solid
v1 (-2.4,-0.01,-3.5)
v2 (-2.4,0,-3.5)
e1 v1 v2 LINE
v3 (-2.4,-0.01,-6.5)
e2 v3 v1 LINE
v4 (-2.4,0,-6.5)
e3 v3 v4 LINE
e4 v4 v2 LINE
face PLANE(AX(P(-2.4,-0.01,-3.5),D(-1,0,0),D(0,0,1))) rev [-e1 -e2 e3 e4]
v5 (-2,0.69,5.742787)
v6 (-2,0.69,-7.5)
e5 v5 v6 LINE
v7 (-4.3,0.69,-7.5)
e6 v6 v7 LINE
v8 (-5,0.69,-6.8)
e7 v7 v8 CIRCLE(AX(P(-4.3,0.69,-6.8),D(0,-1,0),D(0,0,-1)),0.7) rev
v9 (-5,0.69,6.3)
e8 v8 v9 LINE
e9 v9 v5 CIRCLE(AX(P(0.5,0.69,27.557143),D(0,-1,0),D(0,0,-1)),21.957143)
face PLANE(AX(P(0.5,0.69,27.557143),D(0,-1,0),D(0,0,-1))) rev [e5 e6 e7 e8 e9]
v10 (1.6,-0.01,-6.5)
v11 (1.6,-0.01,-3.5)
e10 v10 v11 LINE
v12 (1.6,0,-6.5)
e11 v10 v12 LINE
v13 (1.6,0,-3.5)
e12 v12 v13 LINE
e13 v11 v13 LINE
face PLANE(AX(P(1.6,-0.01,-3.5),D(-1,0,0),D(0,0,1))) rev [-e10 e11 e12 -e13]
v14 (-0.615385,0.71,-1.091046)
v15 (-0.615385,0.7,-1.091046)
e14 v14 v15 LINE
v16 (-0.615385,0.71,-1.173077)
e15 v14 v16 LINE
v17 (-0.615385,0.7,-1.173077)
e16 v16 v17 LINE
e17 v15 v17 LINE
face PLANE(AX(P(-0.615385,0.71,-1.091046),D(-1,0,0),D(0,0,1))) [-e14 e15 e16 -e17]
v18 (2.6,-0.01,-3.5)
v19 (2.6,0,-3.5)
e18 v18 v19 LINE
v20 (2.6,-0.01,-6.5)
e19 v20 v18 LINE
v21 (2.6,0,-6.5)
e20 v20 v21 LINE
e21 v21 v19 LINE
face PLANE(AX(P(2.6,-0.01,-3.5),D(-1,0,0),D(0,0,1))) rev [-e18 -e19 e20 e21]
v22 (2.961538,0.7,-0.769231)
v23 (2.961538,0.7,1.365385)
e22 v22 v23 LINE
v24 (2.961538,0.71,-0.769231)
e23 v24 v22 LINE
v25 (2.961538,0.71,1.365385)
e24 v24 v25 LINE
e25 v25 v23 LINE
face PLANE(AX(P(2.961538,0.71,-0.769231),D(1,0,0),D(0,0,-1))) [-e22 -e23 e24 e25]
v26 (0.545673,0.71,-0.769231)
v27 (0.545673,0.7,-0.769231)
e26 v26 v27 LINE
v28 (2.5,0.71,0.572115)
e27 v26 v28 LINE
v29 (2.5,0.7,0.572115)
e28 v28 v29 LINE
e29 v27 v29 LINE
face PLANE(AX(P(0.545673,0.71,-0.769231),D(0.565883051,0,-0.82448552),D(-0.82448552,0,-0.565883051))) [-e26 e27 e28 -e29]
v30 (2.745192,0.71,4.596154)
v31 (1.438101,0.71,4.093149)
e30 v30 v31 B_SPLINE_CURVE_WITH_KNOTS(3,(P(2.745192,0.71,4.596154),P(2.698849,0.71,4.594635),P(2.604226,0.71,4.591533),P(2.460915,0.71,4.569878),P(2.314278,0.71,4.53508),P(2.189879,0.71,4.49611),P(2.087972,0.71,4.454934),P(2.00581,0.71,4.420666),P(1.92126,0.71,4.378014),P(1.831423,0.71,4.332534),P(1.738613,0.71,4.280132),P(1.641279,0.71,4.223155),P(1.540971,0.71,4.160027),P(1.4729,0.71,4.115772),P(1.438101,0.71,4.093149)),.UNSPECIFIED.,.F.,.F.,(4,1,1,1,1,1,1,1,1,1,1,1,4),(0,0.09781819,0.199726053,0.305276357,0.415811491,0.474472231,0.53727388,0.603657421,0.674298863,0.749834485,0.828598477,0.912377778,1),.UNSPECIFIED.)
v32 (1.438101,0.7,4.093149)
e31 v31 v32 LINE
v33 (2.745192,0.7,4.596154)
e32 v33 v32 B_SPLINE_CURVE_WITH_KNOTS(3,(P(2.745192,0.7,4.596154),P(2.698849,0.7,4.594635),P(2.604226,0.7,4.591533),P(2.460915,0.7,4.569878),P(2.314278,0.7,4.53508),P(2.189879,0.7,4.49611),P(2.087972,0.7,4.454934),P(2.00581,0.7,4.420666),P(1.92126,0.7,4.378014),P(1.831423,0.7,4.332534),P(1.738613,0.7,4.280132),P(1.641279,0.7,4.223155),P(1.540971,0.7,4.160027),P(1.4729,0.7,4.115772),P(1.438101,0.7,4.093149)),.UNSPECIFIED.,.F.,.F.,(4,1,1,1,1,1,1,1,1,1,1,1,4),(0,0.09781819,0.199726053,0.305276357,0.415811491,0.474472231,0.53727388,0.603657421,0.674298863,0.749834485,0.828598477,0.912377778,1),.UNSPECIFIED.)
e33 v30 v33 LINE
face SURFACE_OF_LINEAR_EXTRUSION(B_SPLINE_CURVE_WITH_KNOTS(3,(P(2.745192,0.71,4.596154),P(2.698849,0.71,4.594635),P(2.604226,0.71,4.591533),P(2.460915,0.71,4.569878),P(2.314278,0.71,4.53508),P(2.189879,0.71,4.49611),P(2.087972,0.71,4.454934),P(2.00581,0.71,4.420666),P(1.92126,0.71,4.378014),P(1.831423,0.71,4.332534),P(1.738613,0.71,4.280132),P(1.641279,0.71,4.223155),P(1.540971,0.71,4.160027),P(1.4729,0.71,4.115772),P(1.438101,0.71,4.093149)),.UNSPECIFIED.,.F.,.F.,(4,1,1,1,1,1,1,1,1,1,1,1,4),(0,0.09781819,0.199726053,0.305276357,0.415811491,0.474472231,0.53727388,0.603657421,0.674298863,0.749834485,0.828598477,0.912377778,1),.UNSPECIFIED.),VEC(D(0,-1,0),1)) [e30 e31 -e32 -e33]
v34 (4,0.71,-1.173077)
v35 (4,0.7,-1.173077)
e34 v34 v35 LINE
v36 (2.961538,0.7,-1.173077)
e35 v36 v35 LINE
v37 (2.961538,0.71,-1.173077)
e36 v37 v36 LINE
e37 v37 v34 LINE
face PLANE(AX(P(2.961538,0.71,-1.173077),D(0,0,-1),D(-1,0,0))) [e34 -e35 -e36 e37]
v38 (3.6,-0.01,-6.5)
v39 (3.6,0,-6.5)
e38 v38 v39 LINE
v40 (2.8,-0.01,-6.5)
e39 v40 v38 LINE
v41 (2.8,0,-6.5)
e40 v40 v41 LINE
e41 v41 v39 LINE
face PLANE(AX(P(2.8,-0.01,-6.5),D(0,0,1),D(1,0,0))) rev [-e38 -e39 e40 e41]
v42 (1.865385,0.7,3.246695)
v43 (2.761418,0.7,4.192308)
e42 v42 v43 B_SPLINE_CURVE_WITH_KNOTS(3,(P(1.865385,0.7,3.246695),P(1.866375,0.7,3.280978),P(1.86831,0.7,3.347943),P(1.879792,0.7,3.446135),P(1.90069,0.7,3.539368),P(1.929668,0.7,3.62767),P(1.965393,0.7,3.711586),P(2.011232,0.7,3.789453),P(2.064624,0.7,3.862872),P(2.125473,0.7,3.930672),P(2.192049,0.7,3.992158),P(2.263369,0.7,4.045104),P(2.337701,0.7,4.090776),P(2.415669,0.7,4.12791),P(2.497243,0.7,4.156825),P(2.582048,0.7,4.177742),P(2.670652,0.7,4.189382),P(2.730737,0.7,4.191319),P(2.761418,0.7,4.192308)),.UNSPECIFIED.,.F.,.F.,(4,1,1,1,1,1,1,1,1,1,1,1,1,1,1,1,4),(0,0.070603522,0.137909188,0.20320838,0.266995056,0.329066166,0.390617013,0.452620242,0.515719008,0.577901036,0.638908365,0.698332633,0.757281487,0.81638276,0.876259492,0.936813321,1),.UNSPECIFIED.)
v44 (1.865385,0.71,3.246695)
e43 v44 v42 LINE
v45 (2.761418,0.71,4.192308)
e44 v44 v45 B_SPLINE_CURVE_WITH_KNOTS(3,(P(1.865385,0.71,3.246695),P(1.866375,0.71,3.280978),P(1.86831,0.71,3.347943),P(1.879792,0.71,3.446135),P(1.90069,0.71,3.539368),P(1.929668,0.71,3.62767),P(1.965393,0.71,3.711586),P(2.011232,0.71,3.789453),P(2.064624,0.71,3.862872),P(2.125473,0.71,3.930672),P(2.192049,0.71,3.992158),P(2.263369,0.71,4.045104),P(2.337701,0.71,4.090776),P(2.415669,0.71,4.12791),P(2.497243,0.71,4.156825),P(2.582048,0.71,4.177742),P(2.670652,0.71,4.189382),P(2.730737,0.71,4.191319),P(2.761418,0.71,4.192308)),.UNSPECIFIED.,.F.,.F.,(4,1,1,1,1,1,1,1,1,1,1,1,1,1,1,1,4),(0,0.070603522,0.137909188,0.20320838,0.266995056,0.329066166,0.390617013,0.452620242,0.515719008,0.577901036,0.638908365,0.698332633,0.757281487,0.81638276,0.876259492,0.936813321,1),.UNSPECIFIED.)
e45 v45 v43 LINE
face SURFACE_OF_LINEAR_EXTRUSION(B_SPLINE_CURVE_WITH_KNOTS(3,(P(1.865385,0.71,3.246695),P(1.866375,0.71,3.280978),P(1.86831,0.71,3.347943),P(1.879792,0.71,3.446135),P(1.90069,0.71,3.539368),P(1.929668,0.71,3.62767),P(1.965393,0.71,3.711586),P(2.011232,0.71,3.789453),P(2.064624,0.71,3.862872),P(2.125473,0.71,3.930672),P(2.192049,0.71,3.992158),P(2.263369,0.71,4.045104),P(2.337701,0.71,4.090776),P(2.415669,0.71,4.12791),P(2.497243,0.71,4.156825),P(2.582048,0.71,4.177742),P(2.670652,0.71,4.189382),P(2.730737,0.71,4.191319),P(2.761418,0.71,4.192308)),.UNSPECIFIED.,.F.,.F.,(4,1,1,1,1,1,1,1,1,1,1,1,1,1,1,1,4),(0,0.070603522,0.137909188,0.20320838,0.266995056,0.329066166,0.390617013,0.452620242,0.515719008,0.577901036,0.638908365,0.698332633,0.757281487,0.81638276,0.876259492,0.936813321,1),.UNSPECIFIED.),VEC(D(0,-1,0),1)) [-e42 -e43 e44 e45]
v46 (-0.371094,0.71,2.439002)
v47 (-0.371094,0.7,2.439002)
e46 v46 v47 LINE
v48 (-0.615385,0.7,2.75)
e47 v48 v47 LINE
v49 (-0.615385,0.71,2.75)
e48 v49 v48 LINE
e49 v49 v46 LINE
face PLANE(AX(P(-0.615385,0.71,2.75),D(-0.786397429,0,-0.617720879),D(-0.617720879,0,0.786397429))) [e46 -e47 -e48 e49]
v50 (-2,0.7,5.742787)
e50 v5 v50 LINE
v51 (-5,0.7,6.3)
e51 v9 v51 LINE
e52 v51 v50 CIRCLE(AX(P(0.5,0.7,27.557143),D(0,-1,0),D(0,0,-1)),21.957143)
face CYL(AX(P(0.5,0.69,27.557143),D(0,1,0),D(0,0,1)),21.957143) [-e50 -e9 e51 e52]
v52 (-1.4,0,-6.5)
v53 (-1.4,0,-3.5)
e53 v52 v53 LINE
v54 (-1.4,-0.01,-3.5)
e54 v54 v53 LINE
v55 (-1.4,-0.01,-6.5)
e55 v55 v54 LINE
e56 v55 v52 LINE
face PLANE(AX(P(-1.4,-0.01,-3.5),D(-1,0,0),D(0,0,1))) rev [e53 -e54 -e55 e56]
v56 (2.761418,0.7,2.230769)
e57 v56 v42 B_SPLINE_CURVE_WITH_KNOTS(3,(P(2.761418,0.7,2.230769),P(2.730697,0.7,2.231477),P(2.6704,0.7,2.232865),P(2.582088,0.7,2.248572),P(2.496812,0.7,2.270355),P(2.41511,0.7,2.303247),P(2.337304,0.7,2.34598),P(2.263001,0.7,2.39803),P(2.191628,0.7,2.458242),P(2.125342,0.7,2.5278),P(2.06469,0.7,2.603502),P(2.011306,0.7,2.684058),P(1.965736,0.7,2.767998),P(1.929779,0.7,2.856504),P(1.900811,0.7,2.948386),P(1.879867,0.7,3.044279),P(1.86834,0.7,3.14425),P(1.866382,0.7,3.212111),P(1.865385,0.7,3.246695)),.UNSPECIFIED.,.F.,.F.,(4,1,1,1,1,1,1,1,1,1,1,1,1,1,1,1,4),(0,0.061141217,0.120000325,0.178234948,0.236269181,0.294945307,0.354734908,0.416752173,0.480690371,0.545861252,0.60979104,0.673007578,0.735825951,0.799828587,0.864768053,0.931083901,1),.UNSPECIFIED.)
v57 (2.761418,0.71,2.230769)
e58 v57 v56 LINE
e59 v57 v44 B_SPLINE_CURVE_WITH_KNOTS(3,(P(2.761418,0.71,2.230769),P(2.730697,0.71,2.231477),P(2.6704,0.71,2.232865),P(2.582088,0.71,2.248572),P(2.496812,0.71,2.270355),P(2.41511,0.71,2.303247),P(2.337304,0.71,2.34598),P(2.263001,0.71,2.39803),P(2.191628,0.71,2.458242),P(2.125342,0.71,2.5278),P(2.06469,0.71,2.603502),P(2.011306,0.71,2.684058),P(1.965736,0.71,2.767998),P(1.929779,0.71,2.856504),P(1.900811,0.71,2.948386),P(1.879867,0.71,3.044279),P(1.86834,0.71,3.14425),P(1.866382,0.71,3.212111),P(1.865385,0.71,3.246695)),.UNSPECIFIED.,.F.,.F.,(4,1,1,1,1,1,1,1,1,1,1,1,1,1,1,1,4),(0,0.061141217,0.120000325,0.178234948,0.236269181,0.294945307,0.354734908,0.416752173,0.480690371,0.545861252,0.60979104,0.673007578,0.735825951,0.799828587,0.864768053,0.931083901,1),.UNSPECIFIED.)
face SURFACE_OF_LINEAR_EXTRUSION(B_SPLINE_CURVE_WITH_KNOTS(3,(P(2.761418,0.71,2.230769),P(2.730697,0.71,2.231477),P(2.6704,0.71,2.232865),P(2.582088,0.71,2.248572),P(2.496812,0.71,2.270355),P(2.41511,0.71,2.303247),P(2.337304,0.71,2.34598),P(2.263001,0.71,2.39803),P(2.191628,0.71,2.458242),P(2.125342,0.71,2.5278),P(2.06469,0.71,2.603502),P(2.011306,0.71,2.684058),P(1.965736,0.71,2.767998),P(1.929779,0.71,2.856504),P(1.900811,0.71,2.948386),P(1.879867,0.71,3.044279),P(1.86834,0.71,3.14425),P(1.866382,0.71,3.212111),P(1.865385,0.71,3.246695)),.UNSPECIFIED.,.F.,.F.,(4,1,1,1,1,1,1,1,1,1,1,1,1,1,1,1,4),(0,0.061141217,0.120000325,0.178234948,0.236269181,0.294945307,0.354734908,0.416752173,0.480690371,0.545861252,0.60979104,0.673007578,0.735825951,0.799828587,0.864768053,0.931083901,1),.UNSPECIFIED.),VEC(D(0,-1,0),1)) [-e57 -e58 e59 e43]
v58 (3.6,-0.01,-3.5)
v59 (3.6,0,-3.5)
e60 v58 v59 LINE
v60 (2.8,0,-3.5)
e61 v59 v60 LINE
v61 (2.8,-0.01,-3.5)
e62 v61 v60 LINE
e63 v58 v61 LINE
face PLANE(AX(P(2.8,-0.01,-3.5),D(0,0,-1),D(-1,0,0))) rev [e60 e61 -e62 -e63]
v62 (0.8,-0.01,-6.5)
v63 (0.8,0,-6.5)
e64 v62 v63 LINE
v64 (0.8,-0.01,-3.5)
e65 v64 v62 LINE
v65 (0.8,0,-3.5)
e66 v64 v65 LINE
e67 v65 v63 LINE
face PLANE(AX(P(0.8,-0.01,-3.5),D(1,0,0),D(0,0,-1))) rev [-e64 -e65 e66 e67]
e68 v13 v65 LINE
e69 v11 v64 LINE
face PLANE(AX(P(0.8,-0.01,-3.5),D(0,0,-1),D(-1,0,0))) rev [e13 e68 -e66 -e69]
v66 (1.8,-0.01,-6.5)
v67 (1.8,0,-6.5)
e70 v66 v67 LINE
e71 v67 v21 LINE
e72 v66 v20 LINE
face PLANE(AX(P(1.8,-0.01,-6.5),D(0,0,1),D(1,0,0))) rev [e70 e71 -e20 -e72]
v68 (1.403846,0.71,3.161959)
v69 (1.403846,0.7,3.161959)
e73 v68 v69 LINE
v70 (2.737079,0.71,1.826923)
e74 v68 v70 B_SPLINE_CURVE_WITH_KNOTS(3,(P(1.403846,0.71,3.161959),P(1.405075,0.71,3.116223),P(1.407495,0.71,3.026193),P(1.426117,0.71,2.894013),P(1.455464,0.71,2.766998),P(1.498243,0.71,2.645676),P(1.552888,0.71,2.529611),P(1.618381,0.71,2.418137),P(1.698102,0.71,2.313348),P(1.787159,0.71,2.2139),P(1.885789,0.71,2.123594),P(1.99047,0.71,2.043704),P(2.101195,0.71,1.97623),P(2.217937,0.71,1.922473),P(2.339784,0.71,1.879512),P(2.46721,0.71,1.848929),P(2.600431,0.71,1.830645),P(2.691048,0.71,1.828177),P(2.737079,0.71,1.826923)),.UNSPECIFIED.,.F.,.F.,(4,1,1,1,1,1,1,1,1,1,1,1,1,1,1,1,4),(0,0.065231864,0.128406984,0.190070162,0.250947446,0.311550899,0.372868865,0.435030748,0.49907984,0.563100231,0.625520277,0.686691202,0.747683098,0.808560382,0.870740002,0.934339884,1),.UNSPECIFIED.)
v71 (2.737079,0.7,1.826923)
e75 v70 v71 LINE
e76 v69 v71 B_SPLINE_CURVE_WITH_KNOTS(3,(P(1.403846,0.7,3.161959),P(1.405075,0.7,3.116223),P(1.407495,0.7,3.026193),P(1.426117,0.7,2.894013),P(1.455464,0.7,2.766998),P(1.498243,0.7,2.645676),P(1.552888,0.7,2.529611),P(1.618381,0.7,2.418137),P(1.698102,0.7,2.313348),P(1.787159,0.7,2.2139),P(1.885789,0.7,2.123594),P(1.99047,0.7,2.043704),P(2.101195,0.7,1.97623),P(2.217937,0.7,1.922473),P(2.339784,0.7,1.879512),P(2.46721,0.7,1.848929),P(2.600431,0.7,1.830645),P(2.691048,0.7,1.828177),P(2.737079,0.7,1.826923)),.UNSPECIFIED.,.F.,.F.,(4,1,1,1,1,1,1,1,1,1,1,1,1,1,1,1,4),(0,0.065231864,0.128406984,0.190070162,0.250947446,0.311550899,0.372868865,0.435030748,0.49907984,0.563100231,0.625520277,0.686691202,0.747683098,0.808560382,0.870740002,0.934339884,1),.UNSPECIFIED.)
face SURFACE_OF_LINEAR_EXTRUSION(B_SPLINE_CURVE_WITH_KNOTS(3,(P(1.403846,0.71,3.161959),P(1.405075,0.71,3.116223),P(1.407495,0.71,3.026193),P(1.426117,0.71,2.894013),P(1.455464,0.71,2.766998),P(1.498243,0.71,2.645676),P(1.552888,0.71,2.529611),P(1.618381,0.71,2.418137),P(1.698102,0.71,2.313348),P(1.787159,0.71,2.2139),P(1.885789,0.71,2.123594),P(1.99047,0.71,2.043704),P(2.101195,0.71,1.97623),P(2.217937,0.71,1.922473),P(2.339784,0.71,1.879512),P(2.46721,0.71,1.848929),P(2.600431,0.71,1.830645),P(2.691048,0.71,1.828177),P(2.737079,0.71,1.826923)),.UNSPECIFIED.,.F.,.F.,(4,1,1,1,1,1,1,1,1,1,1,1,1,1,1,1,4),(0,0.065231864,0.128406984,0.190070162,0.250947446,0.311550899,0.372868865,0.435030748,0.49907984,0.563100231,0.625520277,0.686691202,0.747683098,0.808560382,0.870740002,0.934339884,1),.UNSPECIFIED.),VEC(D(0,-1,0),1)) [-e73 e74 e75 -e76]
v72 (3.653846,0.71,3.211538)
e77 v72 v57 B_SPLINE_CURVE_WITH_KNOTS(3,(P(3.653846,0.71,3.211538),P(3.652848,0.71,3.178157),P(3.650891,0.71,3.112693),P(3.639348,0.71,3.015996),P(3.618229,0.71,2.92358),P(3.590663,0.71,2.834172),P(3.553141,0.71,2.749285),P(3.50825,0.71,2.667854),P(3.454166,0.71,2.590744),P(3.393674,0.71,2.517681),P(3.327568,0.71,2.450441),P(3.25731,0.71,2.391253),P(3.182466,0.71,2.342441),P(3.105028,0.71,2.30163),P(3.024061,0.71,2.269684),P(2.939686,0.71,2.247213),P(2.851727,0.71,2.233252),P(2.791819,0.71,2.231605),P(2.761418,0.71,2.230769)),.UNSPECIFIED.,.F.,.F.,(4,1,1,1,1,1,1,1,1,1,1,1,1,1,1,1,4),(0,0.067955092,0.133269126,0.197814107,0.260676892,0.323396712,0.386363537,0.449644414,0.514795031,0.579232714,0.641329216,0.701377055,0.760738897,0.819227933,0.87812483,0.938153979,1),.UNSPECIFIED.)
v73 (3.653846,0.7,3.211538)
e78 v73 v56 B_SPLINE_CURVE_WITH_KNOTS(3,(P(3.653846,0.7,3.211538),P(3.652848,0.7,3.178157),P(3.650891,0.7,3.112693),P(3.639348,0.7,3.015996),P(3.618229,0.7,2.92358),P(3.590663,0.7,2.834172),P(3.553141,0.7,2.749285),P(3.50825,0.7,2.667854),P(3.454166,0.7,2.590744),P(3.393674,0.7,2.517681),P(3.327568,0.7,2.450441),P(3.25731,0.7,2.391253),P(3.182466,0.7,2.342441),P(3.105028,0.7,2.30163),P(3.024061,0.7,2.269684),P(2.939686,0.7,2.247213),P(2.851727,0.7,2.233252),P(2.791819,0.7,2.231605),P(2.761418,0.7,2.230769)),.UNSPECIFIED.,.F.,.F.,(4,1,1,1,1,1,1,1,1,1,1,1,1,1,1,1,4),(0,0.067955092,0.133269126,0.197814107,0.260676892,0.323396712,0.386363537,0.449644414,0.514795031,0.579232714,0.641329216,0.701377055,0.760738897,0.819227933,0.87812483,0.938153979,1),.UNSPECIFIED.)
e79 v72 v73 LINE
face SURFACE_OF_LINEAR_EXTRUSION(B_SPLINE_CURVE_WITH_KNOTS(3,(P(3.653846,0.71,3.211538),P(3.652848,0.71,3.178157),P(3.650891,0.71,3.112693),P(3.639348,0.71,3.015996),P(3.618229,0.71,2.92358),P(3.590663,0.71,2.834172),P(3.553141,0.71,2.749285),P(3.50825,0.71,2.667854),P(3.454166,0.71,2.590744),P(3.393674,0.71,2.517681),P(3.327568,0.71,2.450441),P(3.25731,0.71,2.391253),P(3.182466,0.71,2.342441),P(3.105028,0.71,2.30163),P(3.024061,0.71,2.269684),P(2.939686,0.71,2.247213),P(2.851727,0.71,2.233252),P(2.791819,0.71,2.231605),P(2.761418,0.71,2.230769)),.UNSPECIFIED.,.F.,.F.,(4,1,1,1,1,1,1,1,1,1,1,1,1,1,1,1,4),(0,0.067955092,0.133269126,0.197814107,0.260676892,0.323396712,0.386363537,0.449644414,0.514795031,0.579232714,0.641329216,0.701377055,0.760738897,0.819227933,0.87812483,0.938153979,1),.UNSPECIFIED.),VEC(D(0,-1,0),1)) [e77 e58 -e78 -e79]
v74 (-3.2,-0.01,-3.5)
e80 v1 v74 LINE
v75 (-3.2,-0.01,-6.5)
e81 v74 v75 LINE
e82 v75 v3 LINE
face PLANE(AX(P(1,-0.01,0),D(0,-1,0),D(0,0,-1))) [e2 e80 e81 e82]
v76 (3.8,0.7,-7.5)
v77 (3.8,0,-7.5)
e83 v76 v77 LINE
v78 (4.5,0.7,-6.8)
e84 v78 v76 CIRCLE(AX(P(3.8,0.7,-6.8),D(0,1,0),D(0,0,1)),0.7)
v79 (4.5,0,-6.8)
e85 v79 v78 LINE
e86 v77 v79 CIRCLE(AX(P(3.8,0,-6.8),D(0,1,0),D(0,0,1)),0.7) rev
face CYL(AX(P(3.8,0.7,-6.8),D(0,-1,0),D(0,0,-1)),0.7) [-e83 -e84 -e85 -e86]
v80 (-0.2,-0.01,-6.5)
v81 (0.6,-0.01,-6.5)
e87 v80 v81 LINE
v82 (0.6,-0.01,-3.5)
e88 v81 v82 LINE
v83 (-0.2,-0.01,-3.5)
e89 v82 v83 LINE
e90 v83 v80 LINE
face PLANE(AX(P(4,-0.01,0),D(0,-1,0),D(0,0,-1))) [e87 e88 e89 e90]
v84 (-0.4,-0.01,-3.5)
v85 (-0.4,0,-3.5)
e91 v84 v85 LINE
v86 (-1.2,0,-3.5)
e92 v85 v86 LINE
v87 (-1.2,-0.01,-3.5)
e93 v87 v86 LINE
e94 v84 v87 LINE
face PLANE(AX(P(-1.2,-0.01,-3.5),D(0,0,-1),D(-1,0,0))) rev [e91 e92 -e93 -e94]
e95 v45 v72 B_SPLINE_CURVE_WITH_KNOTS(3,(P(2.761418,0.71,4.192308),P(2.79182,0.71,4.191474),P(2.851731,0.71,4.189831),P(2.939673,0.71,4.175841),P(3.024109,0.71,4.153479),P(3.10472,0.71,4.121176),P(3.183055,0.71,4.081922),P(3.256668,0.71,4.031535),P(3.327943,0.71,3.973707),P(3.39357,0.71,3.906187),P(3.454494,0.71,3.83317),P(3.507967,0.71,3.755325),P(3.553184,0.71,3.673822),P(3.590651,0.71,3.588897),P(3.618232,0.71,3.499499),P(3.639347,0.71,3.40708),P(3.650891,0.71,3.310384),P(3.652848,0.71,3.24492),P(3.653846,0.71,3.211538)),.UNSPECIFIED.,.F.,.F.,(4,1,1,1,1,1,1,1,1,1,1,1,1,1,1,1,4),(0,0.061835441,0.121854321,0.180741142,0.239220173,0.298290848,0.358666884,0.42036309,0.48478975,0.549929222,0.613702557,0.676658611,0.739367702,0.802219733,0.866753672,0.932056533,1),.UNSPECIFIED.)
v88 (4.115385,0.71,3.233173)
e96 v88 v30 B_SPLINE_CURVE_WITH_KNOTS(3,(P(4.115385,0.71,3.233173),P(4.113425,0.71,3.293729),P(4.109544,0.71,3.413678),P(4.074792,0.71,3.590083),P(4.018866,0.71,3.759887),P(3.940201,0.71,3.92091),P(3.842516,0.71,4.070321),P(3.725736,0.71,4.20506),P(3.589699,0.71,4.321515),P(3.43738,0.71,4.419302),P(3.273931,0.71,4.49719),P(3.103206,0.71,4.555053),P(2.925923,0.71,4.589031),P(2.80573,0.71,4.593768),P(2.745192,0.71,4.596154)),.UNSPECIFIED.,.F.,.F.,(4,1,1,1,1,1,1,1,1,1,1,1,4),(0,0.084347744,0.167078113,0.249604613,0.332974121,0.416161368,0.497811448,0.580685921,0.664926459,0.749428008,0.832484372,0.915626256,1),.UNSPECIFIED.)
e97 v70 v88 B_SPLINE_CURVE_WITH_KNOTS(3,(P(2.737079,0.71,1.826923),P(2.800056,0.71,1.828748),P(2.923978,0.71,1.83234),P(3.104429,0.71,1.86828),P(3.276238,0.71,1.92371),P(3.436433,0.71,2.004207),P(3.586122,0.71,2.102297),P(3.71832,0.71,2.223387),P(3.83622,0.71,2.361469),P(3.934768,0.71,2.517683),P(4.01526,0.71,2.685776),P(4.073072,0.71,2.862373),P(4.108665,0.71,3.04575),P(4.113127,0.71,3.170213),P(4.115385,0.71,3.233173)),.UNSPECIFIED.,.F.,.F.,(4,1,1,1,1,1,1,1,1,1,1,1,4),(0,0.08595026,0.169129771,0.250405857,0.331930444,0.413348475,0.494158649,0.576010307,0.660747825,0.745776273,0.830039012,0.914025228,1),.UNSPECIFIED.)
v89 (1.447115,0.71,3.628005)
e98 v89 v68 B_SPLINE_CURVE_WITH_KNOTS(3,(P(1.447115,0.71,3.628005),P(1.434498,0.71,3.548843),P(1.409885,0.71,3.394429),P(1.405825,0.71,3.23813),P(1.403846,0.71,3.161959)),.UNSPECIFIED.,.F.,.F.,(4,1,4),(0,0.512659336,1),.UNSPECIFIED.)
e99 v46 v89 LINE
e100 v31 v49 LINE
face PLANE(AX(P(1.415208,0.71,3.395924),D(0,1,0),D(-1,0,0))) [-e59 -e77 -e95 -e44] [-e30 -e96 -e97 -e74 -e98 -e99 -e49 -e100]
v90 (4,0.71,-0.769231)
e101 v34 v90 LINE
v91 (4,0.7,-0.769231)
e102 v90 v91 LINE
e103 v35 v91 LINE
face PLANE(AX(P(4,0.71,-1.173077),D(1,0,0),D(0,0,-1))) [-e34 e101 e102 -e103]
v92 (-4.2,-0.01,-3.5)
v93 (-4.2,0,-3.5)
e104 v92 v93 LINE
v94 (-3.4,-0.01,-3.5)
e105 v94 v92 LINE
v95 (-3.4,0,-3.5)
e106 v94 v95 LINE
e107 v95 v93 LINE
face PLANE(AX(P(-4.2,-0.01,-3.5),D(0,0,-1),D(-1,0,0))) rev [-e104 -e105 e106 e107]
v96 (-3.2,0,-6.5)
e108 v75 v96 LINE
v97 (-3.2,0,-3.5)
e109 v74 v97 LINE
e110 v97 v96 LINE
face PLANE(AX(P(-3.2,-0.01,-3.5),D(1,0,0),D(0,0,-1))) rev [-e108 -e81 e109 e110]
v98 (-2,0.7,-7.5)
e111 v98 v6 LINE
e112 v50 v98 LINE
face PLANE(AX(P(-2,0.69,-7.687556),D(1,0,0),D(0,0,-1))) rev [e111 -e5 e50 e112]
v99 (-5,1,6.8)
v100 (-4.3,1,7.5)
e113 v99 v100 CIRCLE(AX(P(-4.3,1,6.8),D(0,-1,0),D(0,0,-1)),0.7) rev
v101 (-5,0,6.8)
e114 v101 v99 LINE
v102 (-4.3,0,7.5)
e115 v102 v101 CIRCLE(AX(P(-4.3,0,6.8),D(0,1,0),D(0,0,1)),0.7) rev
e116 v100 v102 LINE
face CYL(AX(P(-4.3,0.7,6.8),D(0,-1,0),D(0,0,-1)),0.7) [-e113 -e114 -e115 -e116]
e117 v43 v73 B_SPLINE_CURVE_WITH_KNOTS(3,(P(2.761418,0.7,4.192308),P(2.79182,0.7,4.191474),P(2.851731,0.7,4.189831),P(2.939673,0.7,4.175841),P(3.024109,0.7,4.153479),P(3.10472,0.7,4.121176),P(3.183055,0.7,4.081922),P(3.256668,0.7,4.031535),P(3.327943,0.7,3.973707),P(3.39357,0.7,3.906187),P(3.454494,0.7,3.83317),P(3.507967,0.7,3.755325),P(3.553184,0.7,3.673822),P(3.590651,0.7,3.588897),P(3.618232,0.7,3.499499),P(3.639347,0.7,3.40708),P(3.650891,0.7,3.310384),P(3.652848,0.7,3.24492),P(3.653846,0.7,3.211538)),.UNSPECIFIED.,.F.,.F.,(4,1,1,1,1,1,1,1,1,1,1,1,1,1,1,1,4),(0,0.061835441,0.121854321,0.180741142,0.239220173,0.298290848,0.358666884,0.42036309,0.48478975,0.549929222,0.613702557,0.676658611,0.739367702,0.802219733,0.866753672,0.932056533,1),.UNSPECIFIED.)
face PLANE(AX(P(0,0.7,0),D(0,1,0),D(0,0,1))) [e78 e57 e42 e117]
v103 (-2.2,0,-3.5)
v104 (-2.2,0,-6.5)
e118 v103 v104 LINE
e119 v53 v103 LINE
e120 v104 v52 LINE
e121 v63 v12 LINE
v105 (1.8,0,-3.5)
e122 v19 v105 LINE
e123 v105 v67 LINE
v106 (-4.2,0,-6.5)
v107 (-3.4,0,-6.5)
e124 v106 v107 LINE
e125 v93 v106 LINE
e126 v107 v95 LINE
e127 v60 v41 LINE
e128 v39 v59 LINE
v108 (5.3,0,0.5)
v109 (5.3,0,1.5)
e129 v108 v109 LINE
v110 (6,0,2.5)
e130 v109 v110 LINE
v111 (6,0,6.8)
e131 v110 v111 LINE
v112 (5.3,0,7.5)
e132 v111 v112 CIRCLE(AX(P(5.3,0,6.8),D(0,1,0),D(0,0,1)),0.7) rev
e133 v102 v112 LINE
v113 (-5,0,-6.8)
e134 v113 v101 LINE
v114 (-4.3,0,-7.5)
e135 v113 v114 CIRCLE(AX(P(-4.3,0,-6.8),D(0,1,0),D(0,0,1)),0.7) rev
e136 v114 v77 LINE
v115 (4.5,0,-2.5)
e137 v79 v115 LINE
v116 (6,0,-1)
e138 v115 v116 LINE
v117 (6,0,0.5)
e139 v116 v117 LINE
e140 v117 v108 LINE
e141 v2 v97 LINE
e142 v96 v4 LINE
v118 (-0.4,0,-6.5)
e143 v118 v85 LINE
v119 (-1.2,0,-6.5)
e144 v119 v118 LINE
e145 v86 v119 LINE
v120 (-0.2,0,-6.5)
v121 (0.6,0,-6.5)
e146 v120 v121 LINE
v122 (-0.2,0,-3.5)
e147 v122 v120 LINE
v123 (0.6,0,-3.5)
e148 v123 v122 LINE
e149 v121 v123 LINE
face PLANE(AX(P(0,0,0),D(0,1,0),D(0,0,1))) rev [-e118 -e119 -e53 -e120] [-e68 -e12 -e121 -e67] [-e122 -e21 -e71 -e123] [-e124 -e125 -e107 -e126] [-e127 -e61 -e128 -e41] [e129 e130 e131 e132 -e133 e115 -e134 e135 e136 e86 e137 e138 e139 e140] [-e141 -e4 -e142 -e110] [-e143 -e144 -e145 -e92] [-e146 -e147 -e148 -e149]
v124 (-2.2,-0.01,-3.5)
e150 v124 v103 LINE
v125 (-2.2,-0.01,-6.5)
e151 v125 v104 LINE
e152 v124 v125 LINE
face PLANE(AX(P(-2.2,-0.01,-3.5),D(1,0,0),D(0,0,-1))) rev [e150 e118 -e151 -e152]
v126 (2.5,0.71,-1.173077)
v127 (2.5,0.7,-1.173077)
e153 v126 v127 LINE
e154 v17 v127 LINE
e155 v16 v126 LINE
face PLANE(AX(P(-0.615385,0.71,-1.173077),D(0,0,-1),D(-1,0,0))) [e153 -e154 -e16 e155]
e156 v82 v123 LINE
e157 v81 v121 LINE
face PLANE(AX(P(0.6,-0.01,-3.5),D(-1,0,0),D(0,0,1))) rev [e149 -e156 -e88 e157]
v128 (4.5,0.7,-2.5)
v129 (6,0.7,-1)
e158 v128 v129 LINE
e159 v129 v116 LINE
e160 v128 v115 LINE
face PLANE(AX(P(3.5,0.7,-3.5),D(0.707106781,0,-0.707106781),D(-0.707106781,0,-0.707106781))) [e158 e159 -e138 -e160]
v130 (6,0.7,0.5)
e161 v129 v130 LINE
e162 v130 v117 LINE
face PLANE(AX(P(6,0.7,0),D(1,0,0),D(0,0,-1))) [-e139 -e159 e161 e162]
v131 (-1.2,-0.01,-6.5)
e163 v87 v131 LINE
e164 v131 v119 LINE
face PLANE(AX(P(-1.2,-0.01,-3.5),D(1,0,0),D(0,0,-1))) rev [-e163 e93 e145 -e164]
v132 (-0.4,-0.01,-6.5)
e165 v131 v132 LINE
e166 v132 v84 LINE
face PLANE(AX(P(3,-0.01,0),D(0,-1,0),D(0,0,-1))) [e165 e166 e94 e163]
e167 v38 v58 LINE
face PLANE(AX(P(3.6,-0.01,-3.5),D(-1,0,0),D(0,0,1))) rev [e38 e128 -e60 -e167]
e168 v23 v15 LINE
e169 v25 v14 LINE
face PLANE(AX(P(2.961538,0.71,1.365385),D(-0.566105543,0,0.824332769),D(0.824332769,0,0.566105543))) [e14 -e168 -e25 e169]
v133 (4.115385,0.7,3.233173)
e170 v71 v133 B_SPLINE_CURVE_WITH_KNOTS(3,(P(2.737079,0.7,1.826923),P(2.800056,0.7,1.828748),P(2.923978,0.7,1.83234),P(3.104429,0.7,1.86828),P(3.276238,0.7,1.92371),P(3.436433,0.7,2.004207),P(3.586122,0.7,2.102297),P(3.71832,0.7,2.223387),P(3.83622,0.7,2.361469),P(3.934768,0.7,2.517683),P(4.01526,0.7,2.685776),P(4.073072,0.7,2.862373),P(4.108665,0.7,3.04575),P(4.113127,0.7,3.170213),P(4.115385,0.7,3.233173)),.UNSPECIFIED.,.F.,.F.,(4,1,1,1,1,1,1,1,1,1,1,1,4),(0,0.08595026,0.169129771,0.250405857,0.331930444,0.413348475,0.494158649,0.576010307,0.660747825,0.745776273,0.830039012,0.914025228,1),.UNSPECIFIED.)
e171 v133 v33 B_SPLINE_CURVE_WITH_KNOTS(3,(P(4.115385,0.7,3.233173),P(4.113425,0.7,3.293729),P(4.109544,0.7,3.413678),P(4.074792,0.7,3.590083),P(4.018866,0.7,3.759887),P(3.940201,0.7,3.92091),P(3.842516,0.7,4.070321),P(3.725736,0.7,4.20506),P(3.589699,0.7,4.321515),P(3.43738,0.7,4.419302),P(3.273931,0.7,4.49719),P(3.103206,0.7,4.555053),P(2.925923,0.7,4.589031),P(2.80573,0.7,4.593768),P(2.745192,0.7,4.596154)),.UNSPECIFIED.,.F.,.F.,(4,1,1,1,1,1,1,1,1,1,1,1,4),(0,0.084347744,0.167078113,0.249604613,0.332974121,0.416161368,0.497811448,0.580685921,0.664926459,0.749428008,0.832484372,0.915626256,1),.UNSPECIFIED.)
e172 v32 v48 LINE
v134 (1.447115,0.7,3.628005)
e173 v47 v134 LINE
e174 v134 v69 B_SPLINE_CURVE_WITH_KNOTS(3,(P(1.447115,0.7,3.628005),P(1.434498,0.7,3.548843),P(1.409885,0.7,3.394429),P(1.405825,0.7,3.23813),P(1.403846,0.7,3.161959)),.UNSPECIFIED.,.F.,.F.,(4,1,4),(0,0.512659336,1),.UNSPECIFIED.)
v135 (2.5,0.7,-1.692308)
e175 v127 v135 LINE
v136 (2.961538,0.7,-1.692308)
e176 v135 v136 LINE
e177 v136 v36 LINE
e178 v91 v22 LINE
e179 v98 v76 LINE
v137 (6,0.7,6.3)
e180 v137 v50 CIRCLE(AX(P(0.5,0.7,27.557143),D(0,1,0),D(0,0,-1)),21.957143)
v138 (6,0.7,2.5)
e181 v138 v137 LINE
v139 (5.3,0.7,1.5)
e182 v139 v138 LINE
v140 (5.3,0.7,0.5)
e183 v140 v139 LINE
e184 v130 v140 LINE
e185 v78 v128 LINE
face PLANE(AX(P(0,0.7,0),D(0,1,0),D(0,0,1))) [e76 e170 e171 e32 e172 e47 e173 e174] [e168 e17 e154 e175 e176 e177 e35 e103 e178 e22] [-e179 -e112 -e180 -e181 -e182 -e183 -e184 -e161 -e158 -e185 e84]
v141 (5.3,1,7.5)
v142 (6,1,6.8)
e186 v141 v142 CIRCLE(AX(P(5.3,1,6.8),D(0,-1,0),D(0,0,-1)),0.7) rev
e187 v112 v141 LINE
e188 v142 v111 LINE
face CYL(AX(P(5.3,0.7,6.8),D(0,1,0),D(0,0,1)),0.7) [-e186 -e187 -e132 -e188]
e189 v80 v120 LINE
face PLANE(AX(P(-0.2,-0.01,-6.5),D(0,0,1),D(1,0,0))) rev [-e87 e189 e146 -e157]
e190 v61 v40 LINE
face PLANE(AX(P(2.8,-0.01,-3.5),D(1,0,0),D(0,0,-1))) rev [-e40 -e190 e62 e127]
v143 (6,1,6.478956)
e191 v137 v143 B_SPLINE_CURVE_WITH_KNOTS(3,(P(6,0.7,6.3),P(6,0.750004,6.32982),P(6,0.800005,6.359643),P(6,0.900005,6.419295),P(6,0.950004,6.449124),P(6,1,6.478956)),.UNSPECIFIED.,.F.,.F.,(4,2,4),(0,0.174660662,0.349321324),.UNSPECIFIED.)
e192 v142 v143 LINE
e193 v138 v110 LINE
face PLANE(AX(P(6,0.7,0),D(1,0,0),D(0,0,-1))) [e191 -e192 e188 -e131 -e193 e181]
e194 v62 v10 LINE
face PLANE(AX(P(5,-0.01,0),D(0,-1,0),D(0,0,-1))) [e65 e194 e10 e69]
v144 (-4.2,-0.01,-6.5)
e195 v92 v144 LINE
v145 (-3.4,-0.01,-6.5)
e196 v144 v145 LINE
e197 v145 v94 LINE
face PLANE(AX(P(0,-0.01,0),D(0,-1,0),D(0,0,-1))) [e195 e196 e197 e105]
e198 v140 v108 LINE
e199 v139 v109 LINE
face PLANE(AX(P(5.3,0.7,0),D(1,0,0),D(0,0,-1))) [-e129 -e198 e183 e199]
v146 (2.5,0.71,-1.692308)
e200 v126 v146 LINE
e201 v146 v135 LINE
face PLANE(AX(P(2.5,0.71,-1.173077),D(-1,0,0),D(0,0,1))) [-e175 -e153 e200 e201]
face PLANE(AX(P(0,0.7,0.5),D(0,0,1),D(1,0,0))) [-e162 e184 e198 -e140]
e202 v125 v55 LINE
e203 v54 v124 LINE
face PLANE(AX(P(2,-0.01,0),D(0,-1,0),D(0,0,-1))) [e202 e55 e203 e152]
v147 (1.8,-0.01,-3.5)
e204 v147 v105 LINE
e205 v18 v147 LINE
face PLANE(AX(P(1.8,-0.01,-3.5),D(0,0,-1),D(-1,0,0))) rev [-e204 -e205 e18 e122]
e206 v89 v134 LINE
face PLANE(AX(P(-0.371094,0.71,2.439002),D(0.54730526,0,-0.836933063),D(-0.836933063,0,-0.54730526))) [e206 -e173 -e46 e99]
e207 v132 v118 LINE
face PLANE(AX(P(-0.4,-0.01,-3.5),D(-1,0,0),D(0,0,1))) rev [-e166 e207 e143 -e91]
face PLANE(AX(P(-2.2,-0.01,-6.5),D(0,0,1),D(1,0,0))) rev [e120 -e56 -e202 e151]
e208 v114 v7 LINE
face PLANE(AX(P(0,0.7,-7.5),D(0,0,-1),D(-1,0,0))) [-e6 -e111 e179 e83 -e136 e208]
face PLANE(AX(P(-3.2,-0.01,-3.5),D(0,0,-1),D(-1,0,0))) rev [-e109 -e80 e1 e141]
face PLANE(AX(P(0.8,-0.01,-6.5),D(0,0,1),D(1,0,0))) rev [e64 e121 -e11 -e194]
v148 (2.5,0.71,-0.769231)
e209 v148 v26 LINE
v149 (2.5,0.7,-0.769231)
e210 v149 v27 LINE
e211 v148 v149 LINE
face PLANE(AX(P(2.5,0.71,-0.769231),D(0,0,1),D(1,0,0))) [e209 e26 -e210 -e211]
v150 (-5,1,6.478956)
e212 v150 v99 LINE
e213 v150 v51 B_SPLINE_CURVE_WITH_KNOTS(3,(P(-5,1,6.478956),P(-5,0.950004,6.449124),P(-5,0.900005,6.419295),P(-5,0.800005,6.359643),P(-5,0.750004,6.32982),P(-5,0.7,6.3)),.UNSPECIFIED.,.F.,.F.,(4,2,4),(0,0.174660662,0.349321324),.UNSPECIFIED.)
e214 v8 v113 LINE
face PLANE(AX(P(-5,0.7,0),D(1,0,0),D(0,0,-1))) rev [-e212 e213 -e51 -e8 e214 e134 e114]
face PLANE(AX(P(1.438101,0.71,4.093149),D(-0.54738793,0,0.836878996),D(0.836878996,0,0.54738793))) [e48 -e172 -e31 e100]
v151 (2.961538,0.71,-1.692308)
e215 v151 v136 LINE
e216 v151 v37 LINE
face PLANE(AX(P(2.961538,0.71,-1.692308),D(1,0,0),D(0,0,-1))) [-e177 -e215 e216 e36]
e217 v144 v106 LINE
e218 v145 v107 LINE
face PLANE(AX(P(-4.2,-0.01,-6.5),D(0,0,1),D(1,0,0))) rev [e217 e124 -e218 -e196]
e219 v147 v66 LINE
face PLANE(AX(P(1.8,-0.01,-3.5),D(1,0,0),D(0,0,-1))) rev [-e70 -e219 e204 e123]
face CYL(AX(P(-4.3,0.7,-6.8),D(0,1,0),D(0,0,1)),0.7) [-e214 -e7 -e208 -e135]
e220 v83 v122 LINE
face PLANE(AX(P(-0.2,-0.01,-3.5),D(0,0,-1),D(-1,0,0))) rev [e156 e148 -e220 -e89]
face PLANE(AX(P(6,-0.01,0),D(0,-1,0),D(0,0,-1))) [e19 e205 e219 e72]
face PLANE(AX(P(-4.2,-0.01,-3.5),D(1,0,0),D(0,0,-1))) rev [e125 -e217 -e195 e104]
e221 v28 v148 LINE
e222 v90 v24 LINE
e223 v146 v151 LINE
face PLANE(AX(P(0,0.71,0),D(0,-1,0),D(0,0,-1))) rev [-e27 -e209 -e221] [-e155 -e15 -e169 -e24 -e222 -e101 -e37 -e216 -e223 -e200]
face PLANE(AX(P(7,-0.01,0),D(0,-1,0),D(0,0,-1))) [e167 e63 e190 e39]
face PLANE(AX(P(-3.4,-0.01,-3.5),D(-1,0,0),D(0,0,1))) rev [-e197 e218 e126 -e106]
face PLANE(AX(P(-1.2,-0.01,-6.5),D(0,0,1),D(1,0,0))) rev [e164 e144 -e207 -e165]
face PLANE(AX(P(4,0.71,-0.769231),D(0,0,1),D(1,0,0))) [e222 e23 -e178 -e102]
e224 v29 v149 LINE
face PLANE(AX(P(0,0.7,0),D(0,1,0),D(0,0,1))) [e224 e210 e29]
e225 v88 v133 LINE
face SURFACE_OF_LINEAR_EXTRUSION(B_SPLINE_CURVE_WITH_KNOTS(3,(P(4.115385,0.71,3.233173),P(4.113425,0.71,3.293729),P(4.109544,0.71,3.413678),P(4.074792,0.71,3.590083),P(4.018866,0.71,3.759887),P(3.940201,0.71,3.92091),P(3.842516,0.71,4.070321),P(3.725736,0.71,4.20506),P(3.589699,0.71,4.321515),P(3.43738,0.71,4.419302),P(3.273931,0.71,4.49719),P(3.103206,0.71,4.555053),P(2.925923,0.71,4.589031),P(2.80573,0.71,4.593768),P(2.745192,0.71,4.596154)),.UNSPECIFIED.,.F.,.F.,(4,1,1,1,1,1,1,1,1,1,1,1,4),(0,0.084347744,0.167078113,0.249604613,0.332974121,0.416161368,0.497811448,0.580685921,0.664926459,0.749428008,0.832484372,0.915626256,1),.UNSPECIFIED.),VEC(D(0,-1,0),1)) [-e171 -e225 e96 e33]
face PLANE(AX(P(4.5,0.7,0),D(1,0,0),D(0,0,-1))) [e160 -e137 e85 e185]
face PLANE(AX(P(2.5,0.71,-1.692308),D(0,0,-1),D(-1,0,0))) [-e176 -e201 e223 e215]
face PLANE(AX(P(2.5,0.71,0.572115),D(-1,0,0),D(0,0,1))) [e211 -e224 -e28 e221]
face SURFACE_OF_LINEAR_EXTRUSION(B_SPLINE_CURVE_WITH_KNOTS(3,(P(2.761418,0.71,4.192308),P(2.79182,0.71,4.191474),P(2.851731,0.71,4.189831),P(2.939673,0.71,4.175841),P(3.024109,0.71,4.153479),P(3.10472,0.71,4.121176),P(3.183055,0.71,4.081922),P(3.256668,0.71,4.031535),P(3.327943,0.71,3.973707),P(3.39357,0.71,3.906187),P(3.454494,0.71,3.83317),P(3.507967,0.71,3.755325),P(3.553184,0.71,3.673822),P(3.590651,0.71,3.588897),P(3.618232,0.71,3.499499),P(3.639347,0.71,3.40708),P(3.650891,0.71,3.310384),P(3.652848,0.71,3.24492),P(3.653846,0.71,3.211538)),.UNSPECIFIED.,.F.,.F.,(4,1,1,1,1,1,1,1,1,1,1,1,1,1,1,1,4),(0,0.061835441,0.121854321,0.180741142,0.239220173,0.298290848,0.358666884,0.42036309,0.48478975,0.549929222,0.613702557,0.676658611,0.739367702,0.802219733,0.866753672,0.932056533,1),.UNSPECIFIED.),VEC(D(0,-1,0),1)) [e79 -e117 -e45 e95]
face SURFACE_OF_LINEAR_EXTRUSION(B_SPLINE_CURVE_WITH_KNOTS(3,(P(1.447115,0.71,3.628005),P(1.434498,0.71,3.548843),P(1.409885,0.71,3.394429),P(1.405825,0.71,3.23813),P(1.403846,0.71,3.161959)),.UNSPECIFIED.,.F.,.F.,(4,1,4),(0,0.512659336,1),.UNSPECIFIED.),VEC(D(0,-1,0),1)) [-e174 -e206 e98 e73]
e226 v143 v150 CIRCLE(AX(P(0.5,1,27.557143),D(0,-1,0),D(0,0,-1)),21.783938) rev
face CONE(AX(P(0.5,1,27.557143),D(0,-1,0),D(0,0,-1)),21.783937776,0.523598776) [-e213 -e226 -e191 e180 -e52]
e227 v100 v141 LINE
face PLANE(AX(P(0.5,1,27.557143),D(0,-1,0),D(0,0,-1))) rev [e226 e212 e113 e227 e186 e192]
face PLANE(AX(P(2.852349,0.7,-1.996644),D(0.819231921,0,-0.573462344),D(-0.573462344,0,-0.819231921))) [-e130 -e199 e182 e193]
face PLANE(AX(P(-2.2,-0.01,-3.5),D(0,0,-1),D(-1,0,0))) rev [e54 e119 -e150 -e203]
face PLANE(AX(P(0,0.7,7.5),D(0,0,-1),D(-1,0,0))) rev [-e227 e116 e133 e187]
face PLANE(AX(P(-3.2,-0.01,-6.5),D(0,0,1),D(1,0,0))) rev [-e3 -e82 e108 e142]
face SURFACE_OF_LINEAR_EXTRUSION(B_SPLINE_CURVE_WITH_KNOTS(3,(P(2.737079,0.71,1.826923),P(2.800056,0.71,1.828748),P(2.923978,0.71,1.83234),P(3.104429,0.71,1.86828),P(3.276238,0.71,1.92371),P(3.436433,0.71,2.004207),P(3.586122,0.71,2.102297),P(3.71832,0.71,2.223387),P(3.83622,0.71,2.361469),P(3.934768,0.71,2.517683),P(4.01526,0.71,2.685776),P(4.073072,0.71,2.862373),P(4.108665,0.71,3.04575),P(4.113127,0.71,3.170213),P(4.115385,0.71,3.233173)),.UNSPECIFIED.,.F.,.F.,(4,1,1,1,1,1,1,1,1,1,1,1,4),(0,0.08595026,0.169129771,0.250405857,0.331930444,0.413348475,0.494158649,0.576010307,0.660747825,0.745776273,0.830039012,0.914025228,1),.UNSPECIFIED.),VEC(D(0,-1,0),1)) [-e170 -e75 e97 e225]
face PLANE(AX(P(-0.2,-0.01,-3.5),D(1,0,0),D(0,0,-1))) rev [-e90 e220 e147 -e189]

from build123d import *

# Parameters (mm, degrees)
BOSS_EXTRUDE1_DEPTH = 0.7
BOSS_EXTRUDE2_DEPTH = 0.3
FILLET1_R           = 0.7
CHAMFER1_SIZE2      = 0.3
CHAMFER1_SIZE       = 0.173205081
SKETCH3_W           = 0.8
SKETCH3_H           = 3
BOSS_EXTRUDE3_DEPTH = 0.01
LPATTERN1_COUNT     = 8
LPATTERN1_PITCH     = 1
CUT_EXTRUDE1_START  = -0.01
CUT_EXTRUDE1_DEPTH  = 0.01
BOSS_EXTRUDE4_DEPTH = 0.01


with BuildPart() as part:
    # Sketch1 → Boss-Extrude1 (new body)
    with BuildSketch(Plane(origin=(0, 0, 0), x_dir=(1, 0, 0), z_dir=(0, 1, 0))):
        Polygon((6, -2.5), (6, -7.5), (-5, -7.5), (-5, 7.5), (4.5, 7.5), (4.5, 2.5), (6, 1), (6, -0.5), (5.3, -0.5), (5.3, -1.5), align=None)
    extrude(amount=BOSS_EXTRUDE1_DEPTH)

    # Sketch2 → Boss-Extrude2 (add)
    with BuildSketch(Plane(origin=(0, 0.7, 0), x_dir=(1, 0, 0), z_dir=(0, 1, 0))):
        with BuildLine():
            Line((-5, -6.3), (-5, -7.5))
            Line((-5, -7.5), (6, -7.5))
            Line((6, -7.5), (6, -6.3))
            ThreePointArc((6, -6.3), (0.5, -5.6), (-5, -6.3))
        make_face()
    extrude(amount=BOSS_EXTRUDE2_DEPTH)

    # Fillet1
    fillet1_edges = [part.edges().sort_by_distance(p)[0] for p in [
        (6, 0.5, 7.5),
        (-5, 0.5, 7.5),
        (-5, 0.35, -7.5),
        (4.5, 0.35, -7.5),
    ]]
    fillet(fillet1_edges, radius=FILLET1_R)

    # Chamfer1
    chamfer1_edges = [part.edges().sort_by_distance(p)[0] for p in [
        (0.5, 1, 5.6),
    ]]
    chamfer1_side = [part.faces().sort_by_distance(p)[0] for p in [
        (0.5, 1, 5.603464102),
    ]]
    chamfer(chamfer1_edges, length=CHAMFER1_SIZE - 0.0001, length2=CHAMFER1_SIZE2 - 0.0001, reference=chamfer1_side[0])  # a hair under: the kernel refuses the full size

    # Sketch3 → Boss-Extrude3 (add)
    with BuildSketch(Plane.XZ):
        with Locations((-3.8, -5)):
            Rectangle(SKETCH3_W, SKETCH3_H)
    boss_extrude3 = extrude(amount=BOSS_EXTRUDE3_DEPTH)

    # LPattern1: Boss-Extrude3 ×8
    with Locations(*[(i * LPATTERN1_PITCH, 0, 0) for i in range(1, LPATTERN1_COUNT)]):
        add(boss_extrude3)

    # Sketch5 → Cut-Extrude1 (cut)
    with BuildSketch(Plane(origin=(0, 0.7, 0), x_dir=(1, 0, 0), z_dir=(0, 1, 0)).offset(CUT_EXTRUDE1_START)):
        with BuildLine():
            Line((-5, -6.3), (-5, 7.687555769))
            Line((-5, 7.687555769), (-2, 7.687555769))
            Line((-2, 7.687555769), (-2, -5.742786977))
            ThreePointArc((-2, -5.742786977), (-3.509690959, -5.969217972), (-5, -6.3))
        make_face()
    extrude(amount=CUT_EXTRUDE1_DEPTH, mode=Mode.SUBTRACT)

    # Sketch4 → Boss-Extrude4 (add)
    # profile 1 of 2: a face of its own
    with BuildSketch(Plane(origin=(0, 0.7, 0), x_dir=(1, 0, 0), z_dir=(0, 1, 0))):
        with BuildLine():
            Line((-0.615384615, -2.75), (-0.37109375, -2.439002404))
            Line((-0.37109375, -2.439002404), (1.447115385, -3.628004808))
            add(Edge.make_bspline(
                [(1.447115385, -3.628004808), (1.434497564, -3.548843023), (1.409885078, -3.394429011), (1.405824862, -3.238129999), (1.403846154, -3.161959135)],
                knots=[0, 0, 0, 0, 1.025318673, 2, 2, 2, 2], degree=3))
            add(Edge.make_bspline(
                [(1.403846154, -3.161959135), (1.40507544, -3.116223068), (1.407495254, -3.026192981), (1.426117348, -2.894012808), (1.455463919, -2.766998457), (1.498242541, -2.645676402), (1.552888396, -2.529611073), (1.618381342, -2.418136818), (1.698102499, -2.313347546), (1.787159106, -2.21389978), (1.885789037, -2.12359384), (1.990470293, -2.043703676), (2.101194596, -1.97622976), (2.217937047, -1.922472915), (2.339783801, -1.879511677), (2.46721007, -1.848928505), (2.600430921, -1.830645424), (2.691048417, -1.828176974), (2.737079327, -1.826923077)],
                knots=[0, 0, 0, 0, 1.043709831, 2.054511743, 3.041122595, 4.01515914, 4.98481438, 5.965901842, 6.960491961, 7.985277438, 9.0096037, 10.00832444, 10.987059228, 11.962929573, 12.936966118, 13.931840027, 14.949438142, 16, 16, 16, 16], degree=3))
            add(Edge.make_bspline(
                [(2.737079327, -1.826923077), (2.800055589, -1.828748336), (2.923977968, -1.832340015), (3.104428638, -1.868279847), (3.276237792, -1.923709962), (3.436432503, -2.004206562), (3.586122296, -2.102297304), (3.718320331, -2.223387248), (3.836219906, -2.361468581), (3.934767808, -2.517682681), (4.015260324, -2.685776222), (4.073072014, -2.862372856), (4.108665247, -3.045750298), (4.113127423, -3.170213408), (4.115384615, -3.233173077)],
                knots=[0, 0, 0, 0, 1.031403119, 2.029557249, 3.004870281, 3.983165322, 4.960181699, 5.929903783, 6.912123683, 7.928973898, 8.949315281, 9.960468141, 10.968302741, 12, 12, 12, 12], degree=3))
            add(Edge.make_bspline(
                [(4.115384615, -3.233173077), (4.113425363, -3.293728526), (4.109544427, -3.413678269), (4.074792271, -3.590083158), (4.018865585, -3.759886916), (3.940200981, -3.920909877), (3.842516001, -4.070320901), (3.725735923, -4.205059604), (3.589698509, -4.321514883), (3.437379658, -4.419302266), (3.273930698, -4.497189895), (3.103206109, -4.555053217), (2.925922629, -4.589030783), (2.805730368, -4.59376788), (2.745192308, -4.596153846)],
                knots=[0, 0, 0, 0, 1.012172929, 2.004937354, 2.995255351, 3.995689452, 4.993936421, 5.973737378, 6.968231049, 7.979117505, 8.993136101, 9.989812463, 10.987515067, 12, 12, 12, 12], degree=3))
            add(Edge.make_bspline(
                [(2.745192308, -4.596153846), (2.698849272, -4.594634845), (2.604225648, -4.591533336), (2.460914755, -4.569877549), (2.31427765, -4.535079955), (2.189879401, -4.496109639), (2.08797173, -4.454933854), (2.005810099, -4.420666303), (1.921260148, -4.378014023), (1.831422616, -4.332533961), (1.738612774, -4.280132273), (1.641279485, -4.223155009), (1.54097072, -4.160026886), (1.472899612, -4.115772392), (1.438100962, -4.093149038)],
                knots=[0, 0, 0, 0, 1.173818275, 2.396712641, 3.66331629, 4.989737886, 5.693666774, 6.447286557, 7.243889047, 8.091586357, 8.998013824, 9.943181721, 10.948533338, 12, 12, 12, 12], degree=3))
            Line((1.438100962, -4.093149038), (-0.615384615, -2.75))
        make_face()
        with BuildLine():
            add(Edge.make_bspline(
                [(1.865384615, -3.246694712), (1.8663753, -3.28097808), (1.868310394, -3.347943459), (1.879792233, -3.446134849), (1.900690488, -3.539368105), (1.929667741, -3.627670289), (1.965393302, -3.711586134), (2.011232334, -3.789452661), (2.064624344, -3.862872186), (2.125472743, -3.930671657), (2.192048636, -3.992157699), (2.263368863, -4.045103926), (2.337700822, -4.090775827), (2.415669188, -4.12790953), (2.497243218, -4.156825359), (2.582047978, -4.177741676), (2.670652083, -4.189382215), (2.73073673, -4.191318798), (2.761418269, -4.192307692)],
                knots=[0, 0, 0, 0, 1.129656352, 2.206547016, 3.251334079, 4.271920891, 5.265058649, 6.249872215, 7.241923875, 8.251504132, 9.246416584, 10.222533834, 11.173322129, 12.116503788, 13.062124155, 14.020151864, 14.989013135, 16, 16, 16, 16], degree=3))
            add(Edge.make_bspline(
                [(2.761418269, -4.192307692), (2.791820074, -4.191473852), (2.851730559, -4.189830668), (2.939673033, -4.175840608), (3.024108675, -4.153478957), (3.10472016, -4.121176044), (3.183055016, -4.08192157), (3.256667917, -4.031535431), (3.327943341, -3.973706783), (3.393569596, -3.906186554), (3.454494335, -3.833170458), (3.50796717, -3.755324944), (3.553183997, -3.673822107), (3.590651134, -3.588896682), (3.618232291, -3.499498881), (3.639347167, -3.4070803), (3.650890957, -3.3103844), (3.652848159, -3.244919557), (3.653846154, -3.211538462)],
                knots=[0, 0, 0, 0, 0.989367052, 1.949669134, 2.891858276, 3.827522767, 4.772653562, 5.738670152, 6.725809442, 7.756636004, 8.798867547, 9.819240912, 10.826537776, 11.829883227, 12.835515726, 13.868058748, 14.912904531, 16, 16, 16, 16], degree=3))
            add(Edge.make_bspline(
                [(3.653846154, -3.211538462), (3.652848082, -3.178157421), (3.650890727, -3.112692685), (3.639348041, -3.015996006), (3.618229086, -2.9235803), (3.590662748, -2.834172058), (3.553140653, -2.749285358), (3.508250138, -2.667853764), (3.454166469, -2.590744499), (3.393674202, -2.517680886), (3.32756834, -2.45044126), (3.257310144, -2.391252543), (3.182466, -2.342440577), (3.105028171, -2.301629691), (3.024060526, -2.269684452), (2.939686174, -2.247212711), (2.85172713, -2.233252413), (2.79181892, -2.231605144), (2.761418269, -2.230769231)],
                knots=[0, 0, 0, 0, 1.087281468, 2.132306021, 3.165025708, 4.170830268, 5.174347389, 6.181816599, 7.194310624, 8.23672049, 9.267723423, 10.261267456, 11.222032883, 12.171822355, 13.107646935, 14.049997283, 15.01046367, 16, 16, 16, 16], degree=3))
            add(Edge.make_bspline(
                [(2.761418269, -2.230769231), (2.730696704, -2.23147675), (2.670400261, -2.232865381), (2.582087612, -2.248571602), (2.496812336, -2.270354649), (2.415110442, -2.303247134), (2.337304096, -2.345979773), (2.263001203, -2.398030102), (2.191628428, -2.458242489), (2.125342463, -2.527800045), (2.064690312, -2.603502471), (2.011305764, -2.684058006), (1.965736495, -2.767997769), (1.929778734, -2.856504174), (1.900810753, -2.948386374), (1.879866743, -3.044278828), (1.868340324, -3.144249739), (1.866382401, -3.212111437), (1.865384615, -3.246694712)],
                knots=[0, 0, 0, 0, 0.978259475, 1.920005202, 2.851759169, 3.7803069, 4.719124913, 5.675758531, 6.668034766, 7.691045932, 8.733780038, 9.756656648, 10.768121246, 11.773215211, 12.79725739, 13.836288844, 14.897342417, 16, 16, 16, 16], degree=3))
        make_face(mode=Mode.SUBTRACT)
    # profile 2 of 2: a face of its own
    with BuildSketch(Plane(origin=(0, 0.7, 0), x_dir=(1, 0, 0), z_dir=(0, 1, 0))):
        Polygon((-0.615384615, 1.091045673), (-0.615384615, 1.173076923), (2.5, 1.173076923), (2.5, 1.692307692), (2.961538462, 1.692307692), (2.961538462, 1.173076923), (4, 1.173076923), (4, 0.769230769), (2.961538462, 0.769230769), (2.961538462, -1.365384615), align=None)
        Polygon((2.5, 0.769230769), (0.545673077, 0.769230769), (2.5, -0.572115385), align=None, mode=Mode.SUBTRACT)
    extrude(amount=BOSS_EXTRUDE4_DEPTH)


solid = part.part
